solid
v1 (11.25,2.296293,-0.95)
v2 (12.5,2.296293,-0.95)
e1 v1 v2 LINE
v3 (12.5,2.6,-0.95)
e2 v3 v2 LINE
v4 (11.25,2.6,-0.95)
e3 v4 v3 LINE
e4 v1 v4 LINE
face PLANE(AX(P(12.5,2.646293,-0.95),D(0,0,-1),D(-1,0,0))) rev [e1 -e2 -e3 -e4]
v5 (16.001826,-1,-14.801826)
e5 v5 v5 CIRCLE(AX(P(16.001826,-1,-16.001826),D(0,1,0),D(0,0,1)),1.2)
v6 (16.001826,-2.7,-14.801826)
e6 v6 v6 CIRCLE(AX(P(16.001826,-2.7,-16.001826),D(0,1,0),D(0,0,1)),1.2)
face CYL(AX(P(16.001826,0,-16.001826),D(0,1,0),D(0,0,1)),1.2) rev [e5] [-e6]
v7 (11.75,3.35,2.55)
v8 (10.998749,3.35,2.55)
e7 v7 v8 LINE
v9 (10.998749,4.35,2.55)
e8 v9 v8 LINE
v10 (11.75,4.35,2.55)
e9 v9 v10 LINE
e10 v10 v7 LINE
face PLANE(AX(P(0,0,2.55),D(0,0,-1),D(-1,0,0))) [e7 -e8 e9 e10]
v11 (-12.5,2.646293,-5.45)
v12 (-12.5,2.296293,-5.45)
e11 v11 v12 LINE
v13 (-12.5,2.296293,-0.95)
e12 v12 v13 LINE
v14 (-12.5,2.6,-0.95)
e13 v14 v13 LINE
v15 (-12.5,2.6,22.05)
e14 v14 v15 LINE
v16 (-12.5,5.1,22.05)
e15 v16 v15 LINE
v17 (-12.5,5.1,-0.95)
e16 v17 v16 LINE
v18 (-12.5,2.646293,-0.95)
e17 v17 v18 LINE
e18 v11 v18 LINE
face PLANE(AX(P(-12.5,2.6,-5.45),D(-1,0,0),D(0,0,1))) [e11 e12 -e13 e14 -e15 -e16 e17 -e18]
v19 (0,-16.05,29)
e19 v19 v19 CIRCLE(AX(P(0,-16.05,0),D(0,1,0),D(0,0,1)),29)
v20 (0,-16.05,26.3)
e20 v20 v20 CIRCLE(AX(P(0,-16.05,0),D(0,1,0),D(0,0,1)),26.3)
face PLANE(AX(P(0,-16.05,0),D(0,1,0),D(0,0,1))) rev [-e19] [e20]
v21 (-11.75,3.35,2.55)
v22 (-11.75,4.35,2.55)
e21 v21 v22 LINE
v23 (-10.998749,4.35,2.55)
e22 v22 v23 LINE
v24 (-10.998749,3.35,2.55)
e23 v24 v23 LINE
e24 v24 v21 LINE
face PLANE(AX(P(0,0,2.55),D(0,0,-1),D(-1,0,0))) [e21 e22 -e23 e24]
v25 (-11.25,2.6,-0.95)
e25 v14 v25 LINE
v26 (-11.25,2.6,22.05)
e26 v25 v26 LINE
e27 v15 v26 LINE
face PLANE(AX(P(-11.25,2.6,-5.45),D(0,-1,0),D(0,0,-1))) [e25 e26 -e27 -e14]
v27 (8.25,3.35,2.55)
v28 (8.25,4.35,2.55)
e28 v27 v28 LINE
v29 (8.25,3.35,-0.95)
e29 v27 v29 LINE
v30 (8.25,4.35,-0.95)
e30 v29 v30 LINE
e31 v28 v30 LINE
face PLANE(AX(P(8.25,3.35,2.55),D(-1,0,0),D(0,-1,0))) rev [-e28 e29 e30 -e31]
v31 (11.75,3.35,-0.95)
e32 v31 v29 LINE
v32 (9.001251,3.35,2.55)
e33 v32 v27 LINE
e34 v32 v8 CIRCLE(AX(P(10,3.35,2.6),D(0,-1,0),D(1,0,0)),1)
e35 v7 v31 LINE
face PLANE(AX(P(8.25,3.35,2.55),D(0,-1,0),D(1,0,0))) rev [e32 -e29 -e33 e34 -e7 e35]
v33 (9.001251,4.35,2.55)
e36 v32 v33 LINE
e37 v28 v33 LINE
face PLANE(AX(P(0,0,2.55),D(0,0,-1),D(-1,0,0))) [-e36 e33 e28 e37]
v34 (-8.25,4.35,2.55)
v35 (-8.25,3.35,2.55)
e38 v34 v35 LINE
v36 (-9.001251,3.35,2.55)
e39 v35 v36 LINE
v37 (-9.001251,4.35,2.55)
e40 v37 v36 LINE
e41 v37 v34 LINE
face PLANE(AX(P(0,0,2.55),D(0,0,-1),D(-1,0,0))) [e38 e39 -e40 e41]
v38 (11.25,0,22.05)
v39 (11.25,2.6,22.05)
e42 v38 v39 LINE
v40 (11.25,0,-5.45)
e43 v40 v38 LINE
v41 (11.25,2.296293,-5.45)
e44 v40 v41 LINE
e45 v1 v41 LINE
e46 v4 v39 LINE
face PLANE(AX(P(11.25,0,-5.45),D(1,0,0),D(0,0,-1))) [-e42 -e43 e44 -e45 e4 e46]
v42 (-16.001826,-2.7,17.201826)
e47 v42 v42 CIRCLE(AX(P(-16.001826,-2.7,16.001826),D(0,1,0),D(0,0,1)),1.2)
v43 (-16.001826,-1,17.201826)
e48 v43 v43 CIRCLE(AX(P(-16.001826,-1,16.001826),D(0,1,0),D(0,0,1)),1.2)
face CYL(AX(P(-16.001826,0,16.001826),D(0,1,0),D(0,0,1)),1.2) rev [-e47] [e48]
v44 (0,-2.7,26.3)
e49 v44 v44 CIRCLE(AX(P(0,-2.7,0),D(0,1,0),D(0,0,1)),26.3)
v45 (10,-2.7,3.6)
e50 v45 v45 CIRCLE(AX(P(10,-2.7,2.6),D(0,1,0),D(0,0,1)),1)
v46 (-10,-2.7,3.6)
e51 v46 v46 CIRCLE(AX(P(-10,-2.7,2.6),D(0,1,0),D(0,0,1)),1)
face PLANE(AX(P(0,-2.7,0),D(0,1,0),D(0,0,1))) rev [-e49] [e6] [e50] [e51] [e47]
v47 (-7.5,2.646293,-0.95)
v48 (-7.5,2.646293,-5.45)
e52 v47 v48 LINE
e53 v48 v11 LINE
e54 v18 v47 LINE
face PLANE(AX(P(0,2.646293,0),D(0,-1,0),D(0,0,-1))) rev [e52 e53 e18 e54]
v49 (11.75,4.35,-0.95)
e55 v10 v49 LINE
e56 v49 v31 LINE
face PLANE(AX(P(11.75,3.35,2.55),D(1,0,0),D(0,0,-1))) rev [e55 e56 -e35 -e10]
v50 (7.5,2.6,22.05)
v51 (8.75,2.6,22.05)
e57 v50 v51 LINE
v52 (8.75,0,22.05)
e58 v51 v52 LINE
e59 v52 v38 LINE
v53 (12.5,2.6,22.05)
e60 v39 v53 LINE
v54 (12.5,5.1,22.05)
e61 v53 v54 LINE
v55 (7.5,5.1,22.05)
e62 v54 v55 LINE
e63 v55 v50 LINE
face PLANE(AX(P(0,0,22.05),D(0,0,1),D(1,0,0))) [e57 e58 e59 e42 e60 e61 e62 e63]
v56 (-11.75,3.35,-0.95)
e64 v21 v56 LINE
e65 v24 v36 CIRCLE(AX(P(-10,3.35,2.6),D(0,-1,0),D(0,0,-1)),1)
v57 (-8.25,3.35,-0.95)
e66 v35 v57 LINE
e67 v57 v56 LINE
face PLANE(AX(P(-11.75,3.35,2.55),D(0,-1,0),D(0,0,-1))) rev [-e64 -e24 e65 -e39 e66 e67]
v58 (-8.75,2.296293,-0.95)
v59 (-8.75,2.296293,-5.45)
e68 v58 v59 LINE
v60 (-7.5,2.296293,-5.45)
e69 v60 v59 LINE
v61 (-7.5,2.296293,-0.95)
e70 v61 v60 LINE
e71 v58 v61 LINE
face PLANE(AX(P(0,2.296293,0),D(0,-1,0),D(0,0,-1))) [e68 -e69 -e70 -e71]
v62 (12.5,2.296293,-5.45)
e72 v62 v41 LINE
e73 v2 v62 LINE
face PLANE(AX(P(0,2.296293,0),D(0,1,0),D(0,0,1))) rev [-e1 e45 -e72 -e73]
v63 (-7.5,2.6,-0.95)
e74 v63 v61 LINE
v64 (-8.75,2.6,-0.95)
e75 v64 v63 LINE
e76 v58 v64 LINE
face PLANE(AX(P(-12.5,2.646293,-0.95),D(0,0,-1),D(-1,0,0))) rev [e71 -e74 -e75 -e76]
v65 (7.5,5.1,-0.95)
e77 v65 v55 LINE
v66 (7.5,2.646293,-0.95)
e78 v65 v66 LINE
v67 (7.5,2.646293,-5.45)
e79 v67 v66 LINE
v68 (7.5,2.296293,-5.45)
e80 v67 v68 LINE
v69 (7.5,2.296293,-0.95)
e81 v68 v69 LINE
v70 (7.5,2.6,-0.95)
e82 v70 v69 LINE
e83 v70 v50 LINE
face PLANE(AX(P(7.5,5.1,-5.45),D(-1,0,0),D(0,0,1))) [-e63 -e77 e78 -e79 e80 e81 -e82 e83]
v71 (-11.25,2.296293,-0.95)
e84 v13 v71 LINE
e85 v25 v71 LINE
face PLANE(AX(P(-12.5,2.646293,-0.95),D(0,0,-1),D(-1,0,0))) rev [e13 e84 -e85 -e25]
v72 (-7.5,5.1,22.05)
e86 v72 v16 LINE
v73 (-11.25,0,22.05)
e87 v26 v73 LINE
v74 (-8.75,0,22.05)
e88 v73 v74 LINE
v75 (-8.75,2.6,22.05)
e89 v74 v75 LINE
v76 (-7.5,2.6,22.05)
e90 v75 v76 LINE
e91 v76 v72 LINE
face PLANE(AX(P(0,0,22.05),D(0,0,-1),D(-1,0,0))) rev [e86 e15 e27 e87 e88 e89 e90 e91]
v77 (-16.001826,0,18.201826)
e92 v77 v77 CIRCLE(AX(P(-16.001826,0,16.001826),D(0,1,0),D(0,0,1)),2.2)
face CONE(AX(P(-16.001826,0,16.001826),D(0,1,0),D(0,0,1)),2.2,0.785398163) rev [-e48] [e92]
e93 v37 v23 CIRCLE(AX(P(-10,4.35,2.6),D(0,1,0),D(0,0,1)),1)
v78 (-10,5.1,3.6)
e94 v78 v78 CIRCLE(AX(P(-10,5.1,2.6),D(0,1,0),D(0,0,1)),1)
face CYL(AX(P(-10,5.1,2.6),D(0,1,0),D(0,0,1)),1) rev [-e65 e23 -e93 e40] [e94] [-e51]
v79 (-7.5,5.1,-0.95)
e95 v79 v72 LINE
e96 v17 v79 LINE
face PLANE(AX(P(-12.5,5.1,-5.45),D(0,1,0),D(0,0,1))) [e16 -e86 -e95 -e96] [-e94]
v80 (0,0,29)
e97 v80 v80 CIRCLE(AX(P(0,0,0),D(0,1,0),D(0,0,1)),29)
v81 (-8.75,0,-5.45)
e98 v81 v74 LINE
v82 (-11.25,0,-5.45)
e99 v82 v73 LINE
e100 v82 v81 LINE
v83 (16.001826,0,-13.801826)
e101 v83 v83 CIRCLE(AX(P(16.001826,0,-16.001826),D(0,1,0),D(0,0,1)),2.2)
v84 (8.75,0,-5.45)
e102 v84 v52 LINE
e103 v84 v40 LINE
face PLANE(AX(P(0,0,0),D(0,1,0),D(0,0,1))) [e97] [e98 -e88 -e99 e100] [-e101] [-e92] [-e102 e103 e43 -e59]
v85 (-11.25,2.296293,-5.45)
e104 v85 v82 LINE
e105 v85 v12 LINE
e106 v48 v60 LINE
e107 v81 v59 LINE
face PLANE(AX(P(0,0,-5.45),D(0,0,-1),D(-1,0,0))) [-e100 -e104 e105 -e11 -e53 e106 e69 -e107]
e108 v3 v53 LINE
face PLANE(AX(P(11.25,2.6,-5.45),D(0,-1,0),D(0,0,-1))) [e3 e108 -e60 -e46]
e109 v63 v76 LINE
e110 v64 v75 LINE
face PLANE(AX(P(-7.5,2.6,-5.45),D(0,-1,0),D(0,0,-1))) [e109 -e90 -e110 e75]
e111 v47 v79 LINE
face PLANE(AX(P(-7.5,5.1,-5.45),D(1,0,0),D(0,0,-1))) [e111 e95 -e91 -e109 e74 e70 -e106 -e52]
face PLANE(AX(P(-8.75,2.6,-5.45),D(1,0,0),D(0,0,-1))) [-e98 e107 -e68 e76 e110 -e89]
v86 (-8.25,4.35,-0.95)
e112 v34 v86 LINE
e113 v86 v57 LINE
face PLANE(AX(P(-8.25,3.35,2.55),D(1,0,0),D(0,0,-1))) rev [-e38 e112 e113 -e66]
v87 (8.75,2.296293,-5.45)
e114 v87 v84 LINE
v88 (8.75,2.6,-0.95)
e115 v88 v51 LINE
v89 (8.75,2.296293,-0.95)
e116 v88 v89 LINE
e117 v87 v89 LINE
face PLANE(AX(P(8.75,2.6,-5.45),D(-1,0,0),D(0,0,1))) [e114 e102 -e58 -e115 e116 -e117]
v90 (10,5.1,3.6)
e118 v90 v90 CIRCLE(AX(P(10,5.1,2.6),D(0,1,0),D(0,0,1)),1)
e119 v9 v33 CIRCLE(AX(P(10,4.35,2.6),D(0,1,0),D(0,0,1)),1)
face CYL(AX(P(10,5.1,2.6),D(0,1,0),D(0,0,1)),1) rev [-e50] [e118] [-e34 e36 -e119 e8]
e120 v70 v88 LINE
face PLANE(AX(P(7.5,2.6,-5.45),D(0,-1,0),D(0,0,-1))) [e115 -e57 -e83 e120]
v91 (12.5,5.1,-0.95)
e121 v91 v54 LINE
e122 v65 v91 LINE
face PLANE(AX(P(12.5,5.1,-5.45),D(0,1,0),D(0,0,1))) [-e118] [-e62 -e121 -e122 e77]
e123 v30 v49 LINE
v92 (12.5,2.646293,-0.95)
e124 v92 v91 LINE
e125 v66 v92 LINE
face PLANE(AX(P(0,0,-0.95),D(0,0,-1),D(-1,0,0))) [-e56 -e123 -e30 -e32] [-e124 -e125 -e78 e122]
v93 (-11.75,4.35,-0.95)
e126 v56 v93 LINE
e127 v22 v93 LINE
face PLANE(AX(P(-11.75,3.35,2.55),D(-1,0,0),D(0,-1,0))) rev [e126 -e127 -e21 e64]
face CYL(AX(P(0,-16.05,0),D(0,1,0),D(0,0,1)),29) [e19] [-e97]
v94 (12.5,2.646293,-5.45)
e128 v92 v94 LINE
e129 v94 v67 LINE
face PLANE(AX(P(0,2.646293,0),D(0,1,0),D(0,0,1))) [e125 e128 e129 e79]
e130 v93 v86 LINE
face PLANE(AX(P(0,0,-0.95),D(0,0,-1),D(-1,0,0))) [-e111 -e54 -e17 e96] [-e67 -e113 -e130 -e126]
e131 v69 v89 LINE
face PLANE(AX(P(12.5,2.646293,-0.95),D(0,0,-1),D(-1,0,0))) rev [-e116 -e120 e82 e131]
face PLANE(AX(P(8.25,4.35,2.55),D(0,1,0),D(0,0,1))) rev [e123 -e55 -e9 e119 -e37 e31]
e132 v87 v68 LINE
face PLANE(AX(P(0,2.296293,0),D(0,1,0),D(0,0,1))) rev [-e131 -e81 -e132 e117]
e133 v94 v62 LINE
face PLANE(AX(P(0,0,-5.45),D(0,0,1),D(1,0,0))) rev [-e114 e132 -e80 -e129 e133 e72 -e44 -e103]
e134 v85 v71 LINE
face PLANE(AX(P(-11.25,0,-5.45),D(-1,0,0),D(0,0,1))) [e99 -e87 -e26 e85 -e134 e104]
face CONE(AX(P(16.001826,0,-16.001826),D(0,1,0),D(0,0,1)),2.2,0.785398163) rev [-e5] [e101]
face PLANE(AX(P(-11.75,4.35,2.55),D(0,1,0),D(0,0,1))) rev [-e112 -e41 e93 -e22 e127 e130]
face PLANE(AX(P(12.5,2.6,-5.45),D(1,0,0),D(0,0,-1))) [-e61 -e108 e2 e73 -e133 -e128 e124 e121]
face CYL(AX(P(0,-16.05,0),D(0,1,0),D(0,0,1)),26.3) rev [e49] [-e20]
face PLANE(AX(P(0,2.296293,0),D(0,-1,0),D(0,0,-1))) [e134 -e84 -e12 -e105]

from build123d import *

# Parameters (mm, degrees)
BOSS_EXTRUDE1_DEPTH                                  = 22.05
BOSS_EXTRUDE1_DEPTH_BACK                             = 5.45
BOSS_EXTRUDE1_2_DEPTH                                = 22.05
BOSS_EXTRUDE1_2_DEPTH_BACK                           = 5.45
SKETCH3_W                                            = 51.63175717
SKETCH3_H                                            = 2.803707317
CUT_EXTRUDE1_DEPTH                                   = 4.5
SKETCH5_W                                            = 5
SKETCH5_H                                            = 4.5
BOSS_EXTRUDE2_DEPTH                                  = 0.35
SKETCH4_W                                            = 3.5
SKETCH4_H                                            = 1
CUT_EXTRUDE2_DEPTH                                   = 3.5
BOSS_EXTRUDE3_DEPTH                                  = 16.05
SHELL3_START                                         = -16.05
SHELL3_OUTLINE_R                                     = 26.3
SHELL3_DEPTH                                         = 13.35
F_2_0_2_DIAMETER_HOLE1_D                             = 2
CSK_SLOT_FOR_M2_COUNTERSUNK_FLAT_HEAD_SC_D           = 2.4
CSK_SLOT_FOR_M2_COUNTERSUNK_FLAT_HEAD_SC_CSINK_D     = 4.4
CSK_SLOT_FOR_M2_COUNTERSUNK_FLAT_HEAD_SC_CSINK_ANGLE = 90


# Read off the part's stored shape, not the designer's step: Shell3
with BuildPart() as part:
    # Sketch2 → Boss-Extrude1 (new, two sides: drawn at the far end of the back side and taken through both)
    with BuildSketch(Plane.XY.offset(-BOSS_EXTRUDE1_DEPTH_BACK)):
        Polygon((-11.25, 0), (-11.25, 2.6), (-12.5, 2.6), (-12.5, 5.1), (-7.5, 5.1), (-7.5, 2.6), (-8.75, 2.6), (-8.75, 0), align=None)
    extrude(amount=BOSS_EXTRUDE1_DEPTH + BOSS_EXTRUDE1_DEPTH_BACK)


with BuildPart() as body_2:
    # Sketch2 → Boss-Extrude1 2 (new, two sides: drawn at the far end of the back side and taken through both)
    with BuildSketch(Plane.XY.offset(-BOSS_EXTRUDE1_2_DEPTH_BACK)):
        Polygon((8.75, 0), (11.25, 0), (11.25, 2.6), (12.5, 2.6), (12.5, 5.1), (7.5, 5.1), (7.5, 2.6), (8.75, 2.6), align=None)
    extrude(amount=BOSS_EXTRUDE1_2_DEPTH + BOSS_EXTRUDE1_2_DEPTH_BACK)


with BuildPart() as cut_extrude1_tool:
    # Sketch3 → Cut-Extrude1 (new body)
    with BuildSketch(Plane(origin=(0, 0, -5.45), x_dir=(-1, 0, 0), z_dir=(0, 0, -1))):
        with Locations((1.197864232, 3.698146342)):
            Rectangle(SKETCH3_W, SKETCH3_H)
    extrude(amount=-CUT_EXTRUDE1_DEPTH)


with BuildPart() as part_1:
    add(part.part)

    # Cut-Extrude1: cut by cut_extrude1_tool
    add(cut_extrude1_tool.part, mode=Mode.SUBTRACT)



with BuildPart() as body_2_1:
    add(body_2.part)

    # Cut-Extrude1: cut by cut_extrude1_tool
    add(cut_extrude1_tool.part, mode=Mode.SUBTRACT)


with BuildPart() as part_2:
    add(part_1.part)

    add(body_2_1.part)  # Boss-Extrude2 merges body 2
    # Sketch5 → Boss-Extrude2 (add)
    with BuildSketch(Plane(origin=(0, 2.296292683, 0), x_dir=(1, 0, 0), z_dir=(0, 1, 0))):
        with Locations((10, 3.2)):
            Rectangle(SKETCH5_W, SKETCH5_H)
        with Locations((-10, 3.2)):
            Rectangle(SKETCH5_W, SKETCH5_H)
    extrude(amount=BOSS_EXTRUDE2_DEPTH)

    # Sketch4 → Cut-Extrude2 (cut)
    with BuildSketch(Plane(origin=(0, 0, -0.95), x_dir=(-1, 0, 0), z_dir=(0, 0, -1))):
        with Locations((10, 3.85)):
            Rectangle(SKETCH4_W, SKETCH4_H)
        with Locations((-10, 3.85)):
            Rectangle(SKETCH4_W, SKETCH4_H)
    extrude(amount=-CUT_EXTRUDE2_DEPTH, mode=Mode.SUBTRACT)

    # Sketch1 → Boss-Extrude3 (add)
    with BuildSketch(Plane(origin=(0, 0, 0), x_dir=(1, 0, 0), z_dir=(0, 1, 0))):
        with BuildLine():
            ThreePointArc((-29, -7.4e-08), (-26.336723438, -12.139892855), (-18.836069123, -22.05))
            Line((-18.836069123, -22.05), (18.836069123, -22.05))
            ThreePointArc((18.836069123, -22.05), (26.336723454, -12.139892822), (29, 0))
            ThreePointArc((29, 0), (-3.7e-08, 29), (-29, -7.4e-08))
        make_face()
        with BuildLine():
            Line((18.836069123, -22.05), (-18.836069123, -22.05))
            ThreePointArc((-18.836069123, -22.05), (0, -29), (18.836069123, -22.05))
        make_face()
    extrude(amount=-BOSS_EXTRUDE3_DEPTH)

    # Shell3 outline → Shell3 (cut)
    with BuildSketch(Plane(origin=(0, 0, 0), x_dir=(1, 0, 0), z_dir=(0, 1, 0)).offset(SHELL3_START)):
        Circle(SHELL3_OUTLINE_R)
    extrude(amount=SHELL3_DEPTH, mode=Mode.SUBTRACT)

    # Ø2.0 (2) Diameter Hole1 (through all)
    with Locations(Plane(origin=(0, 5.1, 0), x_dir=(1, 0, 0), z_dir=(0, 1, 0))):
        with Locations((10, -2.6), (-10, -2.6)):
            Hole(F_2_0_2_DIAMETER_HOLE1_D / 2)

    # CSK SLOT for M2 Countersunk Flat Head Screw3 (through all)
    with Locations(Plane(origin=(0, 0, 0), x_dir=(1, 0, 0), z_dir=(0, 1, 0))):
        with Locations((-16.001826458, -16.001826458), (16.001826458, 16.001826458)):
            CounterSinkHole(CSK_SLOT_FOR_M2_COUNTERSUNK_FLAT_HEAD_SC_D / 2, CSK_SLOT_FOR_M2_COUNTERSUNK_FLAT_HEAD_SC_CSINK_D / 2, counter_sink_angle=CSK_SLOT_FOR_M2_COUNTERSUNK_FLAT_HEAD_SC_CSINK_ANGLE)


solid = part_2.part
